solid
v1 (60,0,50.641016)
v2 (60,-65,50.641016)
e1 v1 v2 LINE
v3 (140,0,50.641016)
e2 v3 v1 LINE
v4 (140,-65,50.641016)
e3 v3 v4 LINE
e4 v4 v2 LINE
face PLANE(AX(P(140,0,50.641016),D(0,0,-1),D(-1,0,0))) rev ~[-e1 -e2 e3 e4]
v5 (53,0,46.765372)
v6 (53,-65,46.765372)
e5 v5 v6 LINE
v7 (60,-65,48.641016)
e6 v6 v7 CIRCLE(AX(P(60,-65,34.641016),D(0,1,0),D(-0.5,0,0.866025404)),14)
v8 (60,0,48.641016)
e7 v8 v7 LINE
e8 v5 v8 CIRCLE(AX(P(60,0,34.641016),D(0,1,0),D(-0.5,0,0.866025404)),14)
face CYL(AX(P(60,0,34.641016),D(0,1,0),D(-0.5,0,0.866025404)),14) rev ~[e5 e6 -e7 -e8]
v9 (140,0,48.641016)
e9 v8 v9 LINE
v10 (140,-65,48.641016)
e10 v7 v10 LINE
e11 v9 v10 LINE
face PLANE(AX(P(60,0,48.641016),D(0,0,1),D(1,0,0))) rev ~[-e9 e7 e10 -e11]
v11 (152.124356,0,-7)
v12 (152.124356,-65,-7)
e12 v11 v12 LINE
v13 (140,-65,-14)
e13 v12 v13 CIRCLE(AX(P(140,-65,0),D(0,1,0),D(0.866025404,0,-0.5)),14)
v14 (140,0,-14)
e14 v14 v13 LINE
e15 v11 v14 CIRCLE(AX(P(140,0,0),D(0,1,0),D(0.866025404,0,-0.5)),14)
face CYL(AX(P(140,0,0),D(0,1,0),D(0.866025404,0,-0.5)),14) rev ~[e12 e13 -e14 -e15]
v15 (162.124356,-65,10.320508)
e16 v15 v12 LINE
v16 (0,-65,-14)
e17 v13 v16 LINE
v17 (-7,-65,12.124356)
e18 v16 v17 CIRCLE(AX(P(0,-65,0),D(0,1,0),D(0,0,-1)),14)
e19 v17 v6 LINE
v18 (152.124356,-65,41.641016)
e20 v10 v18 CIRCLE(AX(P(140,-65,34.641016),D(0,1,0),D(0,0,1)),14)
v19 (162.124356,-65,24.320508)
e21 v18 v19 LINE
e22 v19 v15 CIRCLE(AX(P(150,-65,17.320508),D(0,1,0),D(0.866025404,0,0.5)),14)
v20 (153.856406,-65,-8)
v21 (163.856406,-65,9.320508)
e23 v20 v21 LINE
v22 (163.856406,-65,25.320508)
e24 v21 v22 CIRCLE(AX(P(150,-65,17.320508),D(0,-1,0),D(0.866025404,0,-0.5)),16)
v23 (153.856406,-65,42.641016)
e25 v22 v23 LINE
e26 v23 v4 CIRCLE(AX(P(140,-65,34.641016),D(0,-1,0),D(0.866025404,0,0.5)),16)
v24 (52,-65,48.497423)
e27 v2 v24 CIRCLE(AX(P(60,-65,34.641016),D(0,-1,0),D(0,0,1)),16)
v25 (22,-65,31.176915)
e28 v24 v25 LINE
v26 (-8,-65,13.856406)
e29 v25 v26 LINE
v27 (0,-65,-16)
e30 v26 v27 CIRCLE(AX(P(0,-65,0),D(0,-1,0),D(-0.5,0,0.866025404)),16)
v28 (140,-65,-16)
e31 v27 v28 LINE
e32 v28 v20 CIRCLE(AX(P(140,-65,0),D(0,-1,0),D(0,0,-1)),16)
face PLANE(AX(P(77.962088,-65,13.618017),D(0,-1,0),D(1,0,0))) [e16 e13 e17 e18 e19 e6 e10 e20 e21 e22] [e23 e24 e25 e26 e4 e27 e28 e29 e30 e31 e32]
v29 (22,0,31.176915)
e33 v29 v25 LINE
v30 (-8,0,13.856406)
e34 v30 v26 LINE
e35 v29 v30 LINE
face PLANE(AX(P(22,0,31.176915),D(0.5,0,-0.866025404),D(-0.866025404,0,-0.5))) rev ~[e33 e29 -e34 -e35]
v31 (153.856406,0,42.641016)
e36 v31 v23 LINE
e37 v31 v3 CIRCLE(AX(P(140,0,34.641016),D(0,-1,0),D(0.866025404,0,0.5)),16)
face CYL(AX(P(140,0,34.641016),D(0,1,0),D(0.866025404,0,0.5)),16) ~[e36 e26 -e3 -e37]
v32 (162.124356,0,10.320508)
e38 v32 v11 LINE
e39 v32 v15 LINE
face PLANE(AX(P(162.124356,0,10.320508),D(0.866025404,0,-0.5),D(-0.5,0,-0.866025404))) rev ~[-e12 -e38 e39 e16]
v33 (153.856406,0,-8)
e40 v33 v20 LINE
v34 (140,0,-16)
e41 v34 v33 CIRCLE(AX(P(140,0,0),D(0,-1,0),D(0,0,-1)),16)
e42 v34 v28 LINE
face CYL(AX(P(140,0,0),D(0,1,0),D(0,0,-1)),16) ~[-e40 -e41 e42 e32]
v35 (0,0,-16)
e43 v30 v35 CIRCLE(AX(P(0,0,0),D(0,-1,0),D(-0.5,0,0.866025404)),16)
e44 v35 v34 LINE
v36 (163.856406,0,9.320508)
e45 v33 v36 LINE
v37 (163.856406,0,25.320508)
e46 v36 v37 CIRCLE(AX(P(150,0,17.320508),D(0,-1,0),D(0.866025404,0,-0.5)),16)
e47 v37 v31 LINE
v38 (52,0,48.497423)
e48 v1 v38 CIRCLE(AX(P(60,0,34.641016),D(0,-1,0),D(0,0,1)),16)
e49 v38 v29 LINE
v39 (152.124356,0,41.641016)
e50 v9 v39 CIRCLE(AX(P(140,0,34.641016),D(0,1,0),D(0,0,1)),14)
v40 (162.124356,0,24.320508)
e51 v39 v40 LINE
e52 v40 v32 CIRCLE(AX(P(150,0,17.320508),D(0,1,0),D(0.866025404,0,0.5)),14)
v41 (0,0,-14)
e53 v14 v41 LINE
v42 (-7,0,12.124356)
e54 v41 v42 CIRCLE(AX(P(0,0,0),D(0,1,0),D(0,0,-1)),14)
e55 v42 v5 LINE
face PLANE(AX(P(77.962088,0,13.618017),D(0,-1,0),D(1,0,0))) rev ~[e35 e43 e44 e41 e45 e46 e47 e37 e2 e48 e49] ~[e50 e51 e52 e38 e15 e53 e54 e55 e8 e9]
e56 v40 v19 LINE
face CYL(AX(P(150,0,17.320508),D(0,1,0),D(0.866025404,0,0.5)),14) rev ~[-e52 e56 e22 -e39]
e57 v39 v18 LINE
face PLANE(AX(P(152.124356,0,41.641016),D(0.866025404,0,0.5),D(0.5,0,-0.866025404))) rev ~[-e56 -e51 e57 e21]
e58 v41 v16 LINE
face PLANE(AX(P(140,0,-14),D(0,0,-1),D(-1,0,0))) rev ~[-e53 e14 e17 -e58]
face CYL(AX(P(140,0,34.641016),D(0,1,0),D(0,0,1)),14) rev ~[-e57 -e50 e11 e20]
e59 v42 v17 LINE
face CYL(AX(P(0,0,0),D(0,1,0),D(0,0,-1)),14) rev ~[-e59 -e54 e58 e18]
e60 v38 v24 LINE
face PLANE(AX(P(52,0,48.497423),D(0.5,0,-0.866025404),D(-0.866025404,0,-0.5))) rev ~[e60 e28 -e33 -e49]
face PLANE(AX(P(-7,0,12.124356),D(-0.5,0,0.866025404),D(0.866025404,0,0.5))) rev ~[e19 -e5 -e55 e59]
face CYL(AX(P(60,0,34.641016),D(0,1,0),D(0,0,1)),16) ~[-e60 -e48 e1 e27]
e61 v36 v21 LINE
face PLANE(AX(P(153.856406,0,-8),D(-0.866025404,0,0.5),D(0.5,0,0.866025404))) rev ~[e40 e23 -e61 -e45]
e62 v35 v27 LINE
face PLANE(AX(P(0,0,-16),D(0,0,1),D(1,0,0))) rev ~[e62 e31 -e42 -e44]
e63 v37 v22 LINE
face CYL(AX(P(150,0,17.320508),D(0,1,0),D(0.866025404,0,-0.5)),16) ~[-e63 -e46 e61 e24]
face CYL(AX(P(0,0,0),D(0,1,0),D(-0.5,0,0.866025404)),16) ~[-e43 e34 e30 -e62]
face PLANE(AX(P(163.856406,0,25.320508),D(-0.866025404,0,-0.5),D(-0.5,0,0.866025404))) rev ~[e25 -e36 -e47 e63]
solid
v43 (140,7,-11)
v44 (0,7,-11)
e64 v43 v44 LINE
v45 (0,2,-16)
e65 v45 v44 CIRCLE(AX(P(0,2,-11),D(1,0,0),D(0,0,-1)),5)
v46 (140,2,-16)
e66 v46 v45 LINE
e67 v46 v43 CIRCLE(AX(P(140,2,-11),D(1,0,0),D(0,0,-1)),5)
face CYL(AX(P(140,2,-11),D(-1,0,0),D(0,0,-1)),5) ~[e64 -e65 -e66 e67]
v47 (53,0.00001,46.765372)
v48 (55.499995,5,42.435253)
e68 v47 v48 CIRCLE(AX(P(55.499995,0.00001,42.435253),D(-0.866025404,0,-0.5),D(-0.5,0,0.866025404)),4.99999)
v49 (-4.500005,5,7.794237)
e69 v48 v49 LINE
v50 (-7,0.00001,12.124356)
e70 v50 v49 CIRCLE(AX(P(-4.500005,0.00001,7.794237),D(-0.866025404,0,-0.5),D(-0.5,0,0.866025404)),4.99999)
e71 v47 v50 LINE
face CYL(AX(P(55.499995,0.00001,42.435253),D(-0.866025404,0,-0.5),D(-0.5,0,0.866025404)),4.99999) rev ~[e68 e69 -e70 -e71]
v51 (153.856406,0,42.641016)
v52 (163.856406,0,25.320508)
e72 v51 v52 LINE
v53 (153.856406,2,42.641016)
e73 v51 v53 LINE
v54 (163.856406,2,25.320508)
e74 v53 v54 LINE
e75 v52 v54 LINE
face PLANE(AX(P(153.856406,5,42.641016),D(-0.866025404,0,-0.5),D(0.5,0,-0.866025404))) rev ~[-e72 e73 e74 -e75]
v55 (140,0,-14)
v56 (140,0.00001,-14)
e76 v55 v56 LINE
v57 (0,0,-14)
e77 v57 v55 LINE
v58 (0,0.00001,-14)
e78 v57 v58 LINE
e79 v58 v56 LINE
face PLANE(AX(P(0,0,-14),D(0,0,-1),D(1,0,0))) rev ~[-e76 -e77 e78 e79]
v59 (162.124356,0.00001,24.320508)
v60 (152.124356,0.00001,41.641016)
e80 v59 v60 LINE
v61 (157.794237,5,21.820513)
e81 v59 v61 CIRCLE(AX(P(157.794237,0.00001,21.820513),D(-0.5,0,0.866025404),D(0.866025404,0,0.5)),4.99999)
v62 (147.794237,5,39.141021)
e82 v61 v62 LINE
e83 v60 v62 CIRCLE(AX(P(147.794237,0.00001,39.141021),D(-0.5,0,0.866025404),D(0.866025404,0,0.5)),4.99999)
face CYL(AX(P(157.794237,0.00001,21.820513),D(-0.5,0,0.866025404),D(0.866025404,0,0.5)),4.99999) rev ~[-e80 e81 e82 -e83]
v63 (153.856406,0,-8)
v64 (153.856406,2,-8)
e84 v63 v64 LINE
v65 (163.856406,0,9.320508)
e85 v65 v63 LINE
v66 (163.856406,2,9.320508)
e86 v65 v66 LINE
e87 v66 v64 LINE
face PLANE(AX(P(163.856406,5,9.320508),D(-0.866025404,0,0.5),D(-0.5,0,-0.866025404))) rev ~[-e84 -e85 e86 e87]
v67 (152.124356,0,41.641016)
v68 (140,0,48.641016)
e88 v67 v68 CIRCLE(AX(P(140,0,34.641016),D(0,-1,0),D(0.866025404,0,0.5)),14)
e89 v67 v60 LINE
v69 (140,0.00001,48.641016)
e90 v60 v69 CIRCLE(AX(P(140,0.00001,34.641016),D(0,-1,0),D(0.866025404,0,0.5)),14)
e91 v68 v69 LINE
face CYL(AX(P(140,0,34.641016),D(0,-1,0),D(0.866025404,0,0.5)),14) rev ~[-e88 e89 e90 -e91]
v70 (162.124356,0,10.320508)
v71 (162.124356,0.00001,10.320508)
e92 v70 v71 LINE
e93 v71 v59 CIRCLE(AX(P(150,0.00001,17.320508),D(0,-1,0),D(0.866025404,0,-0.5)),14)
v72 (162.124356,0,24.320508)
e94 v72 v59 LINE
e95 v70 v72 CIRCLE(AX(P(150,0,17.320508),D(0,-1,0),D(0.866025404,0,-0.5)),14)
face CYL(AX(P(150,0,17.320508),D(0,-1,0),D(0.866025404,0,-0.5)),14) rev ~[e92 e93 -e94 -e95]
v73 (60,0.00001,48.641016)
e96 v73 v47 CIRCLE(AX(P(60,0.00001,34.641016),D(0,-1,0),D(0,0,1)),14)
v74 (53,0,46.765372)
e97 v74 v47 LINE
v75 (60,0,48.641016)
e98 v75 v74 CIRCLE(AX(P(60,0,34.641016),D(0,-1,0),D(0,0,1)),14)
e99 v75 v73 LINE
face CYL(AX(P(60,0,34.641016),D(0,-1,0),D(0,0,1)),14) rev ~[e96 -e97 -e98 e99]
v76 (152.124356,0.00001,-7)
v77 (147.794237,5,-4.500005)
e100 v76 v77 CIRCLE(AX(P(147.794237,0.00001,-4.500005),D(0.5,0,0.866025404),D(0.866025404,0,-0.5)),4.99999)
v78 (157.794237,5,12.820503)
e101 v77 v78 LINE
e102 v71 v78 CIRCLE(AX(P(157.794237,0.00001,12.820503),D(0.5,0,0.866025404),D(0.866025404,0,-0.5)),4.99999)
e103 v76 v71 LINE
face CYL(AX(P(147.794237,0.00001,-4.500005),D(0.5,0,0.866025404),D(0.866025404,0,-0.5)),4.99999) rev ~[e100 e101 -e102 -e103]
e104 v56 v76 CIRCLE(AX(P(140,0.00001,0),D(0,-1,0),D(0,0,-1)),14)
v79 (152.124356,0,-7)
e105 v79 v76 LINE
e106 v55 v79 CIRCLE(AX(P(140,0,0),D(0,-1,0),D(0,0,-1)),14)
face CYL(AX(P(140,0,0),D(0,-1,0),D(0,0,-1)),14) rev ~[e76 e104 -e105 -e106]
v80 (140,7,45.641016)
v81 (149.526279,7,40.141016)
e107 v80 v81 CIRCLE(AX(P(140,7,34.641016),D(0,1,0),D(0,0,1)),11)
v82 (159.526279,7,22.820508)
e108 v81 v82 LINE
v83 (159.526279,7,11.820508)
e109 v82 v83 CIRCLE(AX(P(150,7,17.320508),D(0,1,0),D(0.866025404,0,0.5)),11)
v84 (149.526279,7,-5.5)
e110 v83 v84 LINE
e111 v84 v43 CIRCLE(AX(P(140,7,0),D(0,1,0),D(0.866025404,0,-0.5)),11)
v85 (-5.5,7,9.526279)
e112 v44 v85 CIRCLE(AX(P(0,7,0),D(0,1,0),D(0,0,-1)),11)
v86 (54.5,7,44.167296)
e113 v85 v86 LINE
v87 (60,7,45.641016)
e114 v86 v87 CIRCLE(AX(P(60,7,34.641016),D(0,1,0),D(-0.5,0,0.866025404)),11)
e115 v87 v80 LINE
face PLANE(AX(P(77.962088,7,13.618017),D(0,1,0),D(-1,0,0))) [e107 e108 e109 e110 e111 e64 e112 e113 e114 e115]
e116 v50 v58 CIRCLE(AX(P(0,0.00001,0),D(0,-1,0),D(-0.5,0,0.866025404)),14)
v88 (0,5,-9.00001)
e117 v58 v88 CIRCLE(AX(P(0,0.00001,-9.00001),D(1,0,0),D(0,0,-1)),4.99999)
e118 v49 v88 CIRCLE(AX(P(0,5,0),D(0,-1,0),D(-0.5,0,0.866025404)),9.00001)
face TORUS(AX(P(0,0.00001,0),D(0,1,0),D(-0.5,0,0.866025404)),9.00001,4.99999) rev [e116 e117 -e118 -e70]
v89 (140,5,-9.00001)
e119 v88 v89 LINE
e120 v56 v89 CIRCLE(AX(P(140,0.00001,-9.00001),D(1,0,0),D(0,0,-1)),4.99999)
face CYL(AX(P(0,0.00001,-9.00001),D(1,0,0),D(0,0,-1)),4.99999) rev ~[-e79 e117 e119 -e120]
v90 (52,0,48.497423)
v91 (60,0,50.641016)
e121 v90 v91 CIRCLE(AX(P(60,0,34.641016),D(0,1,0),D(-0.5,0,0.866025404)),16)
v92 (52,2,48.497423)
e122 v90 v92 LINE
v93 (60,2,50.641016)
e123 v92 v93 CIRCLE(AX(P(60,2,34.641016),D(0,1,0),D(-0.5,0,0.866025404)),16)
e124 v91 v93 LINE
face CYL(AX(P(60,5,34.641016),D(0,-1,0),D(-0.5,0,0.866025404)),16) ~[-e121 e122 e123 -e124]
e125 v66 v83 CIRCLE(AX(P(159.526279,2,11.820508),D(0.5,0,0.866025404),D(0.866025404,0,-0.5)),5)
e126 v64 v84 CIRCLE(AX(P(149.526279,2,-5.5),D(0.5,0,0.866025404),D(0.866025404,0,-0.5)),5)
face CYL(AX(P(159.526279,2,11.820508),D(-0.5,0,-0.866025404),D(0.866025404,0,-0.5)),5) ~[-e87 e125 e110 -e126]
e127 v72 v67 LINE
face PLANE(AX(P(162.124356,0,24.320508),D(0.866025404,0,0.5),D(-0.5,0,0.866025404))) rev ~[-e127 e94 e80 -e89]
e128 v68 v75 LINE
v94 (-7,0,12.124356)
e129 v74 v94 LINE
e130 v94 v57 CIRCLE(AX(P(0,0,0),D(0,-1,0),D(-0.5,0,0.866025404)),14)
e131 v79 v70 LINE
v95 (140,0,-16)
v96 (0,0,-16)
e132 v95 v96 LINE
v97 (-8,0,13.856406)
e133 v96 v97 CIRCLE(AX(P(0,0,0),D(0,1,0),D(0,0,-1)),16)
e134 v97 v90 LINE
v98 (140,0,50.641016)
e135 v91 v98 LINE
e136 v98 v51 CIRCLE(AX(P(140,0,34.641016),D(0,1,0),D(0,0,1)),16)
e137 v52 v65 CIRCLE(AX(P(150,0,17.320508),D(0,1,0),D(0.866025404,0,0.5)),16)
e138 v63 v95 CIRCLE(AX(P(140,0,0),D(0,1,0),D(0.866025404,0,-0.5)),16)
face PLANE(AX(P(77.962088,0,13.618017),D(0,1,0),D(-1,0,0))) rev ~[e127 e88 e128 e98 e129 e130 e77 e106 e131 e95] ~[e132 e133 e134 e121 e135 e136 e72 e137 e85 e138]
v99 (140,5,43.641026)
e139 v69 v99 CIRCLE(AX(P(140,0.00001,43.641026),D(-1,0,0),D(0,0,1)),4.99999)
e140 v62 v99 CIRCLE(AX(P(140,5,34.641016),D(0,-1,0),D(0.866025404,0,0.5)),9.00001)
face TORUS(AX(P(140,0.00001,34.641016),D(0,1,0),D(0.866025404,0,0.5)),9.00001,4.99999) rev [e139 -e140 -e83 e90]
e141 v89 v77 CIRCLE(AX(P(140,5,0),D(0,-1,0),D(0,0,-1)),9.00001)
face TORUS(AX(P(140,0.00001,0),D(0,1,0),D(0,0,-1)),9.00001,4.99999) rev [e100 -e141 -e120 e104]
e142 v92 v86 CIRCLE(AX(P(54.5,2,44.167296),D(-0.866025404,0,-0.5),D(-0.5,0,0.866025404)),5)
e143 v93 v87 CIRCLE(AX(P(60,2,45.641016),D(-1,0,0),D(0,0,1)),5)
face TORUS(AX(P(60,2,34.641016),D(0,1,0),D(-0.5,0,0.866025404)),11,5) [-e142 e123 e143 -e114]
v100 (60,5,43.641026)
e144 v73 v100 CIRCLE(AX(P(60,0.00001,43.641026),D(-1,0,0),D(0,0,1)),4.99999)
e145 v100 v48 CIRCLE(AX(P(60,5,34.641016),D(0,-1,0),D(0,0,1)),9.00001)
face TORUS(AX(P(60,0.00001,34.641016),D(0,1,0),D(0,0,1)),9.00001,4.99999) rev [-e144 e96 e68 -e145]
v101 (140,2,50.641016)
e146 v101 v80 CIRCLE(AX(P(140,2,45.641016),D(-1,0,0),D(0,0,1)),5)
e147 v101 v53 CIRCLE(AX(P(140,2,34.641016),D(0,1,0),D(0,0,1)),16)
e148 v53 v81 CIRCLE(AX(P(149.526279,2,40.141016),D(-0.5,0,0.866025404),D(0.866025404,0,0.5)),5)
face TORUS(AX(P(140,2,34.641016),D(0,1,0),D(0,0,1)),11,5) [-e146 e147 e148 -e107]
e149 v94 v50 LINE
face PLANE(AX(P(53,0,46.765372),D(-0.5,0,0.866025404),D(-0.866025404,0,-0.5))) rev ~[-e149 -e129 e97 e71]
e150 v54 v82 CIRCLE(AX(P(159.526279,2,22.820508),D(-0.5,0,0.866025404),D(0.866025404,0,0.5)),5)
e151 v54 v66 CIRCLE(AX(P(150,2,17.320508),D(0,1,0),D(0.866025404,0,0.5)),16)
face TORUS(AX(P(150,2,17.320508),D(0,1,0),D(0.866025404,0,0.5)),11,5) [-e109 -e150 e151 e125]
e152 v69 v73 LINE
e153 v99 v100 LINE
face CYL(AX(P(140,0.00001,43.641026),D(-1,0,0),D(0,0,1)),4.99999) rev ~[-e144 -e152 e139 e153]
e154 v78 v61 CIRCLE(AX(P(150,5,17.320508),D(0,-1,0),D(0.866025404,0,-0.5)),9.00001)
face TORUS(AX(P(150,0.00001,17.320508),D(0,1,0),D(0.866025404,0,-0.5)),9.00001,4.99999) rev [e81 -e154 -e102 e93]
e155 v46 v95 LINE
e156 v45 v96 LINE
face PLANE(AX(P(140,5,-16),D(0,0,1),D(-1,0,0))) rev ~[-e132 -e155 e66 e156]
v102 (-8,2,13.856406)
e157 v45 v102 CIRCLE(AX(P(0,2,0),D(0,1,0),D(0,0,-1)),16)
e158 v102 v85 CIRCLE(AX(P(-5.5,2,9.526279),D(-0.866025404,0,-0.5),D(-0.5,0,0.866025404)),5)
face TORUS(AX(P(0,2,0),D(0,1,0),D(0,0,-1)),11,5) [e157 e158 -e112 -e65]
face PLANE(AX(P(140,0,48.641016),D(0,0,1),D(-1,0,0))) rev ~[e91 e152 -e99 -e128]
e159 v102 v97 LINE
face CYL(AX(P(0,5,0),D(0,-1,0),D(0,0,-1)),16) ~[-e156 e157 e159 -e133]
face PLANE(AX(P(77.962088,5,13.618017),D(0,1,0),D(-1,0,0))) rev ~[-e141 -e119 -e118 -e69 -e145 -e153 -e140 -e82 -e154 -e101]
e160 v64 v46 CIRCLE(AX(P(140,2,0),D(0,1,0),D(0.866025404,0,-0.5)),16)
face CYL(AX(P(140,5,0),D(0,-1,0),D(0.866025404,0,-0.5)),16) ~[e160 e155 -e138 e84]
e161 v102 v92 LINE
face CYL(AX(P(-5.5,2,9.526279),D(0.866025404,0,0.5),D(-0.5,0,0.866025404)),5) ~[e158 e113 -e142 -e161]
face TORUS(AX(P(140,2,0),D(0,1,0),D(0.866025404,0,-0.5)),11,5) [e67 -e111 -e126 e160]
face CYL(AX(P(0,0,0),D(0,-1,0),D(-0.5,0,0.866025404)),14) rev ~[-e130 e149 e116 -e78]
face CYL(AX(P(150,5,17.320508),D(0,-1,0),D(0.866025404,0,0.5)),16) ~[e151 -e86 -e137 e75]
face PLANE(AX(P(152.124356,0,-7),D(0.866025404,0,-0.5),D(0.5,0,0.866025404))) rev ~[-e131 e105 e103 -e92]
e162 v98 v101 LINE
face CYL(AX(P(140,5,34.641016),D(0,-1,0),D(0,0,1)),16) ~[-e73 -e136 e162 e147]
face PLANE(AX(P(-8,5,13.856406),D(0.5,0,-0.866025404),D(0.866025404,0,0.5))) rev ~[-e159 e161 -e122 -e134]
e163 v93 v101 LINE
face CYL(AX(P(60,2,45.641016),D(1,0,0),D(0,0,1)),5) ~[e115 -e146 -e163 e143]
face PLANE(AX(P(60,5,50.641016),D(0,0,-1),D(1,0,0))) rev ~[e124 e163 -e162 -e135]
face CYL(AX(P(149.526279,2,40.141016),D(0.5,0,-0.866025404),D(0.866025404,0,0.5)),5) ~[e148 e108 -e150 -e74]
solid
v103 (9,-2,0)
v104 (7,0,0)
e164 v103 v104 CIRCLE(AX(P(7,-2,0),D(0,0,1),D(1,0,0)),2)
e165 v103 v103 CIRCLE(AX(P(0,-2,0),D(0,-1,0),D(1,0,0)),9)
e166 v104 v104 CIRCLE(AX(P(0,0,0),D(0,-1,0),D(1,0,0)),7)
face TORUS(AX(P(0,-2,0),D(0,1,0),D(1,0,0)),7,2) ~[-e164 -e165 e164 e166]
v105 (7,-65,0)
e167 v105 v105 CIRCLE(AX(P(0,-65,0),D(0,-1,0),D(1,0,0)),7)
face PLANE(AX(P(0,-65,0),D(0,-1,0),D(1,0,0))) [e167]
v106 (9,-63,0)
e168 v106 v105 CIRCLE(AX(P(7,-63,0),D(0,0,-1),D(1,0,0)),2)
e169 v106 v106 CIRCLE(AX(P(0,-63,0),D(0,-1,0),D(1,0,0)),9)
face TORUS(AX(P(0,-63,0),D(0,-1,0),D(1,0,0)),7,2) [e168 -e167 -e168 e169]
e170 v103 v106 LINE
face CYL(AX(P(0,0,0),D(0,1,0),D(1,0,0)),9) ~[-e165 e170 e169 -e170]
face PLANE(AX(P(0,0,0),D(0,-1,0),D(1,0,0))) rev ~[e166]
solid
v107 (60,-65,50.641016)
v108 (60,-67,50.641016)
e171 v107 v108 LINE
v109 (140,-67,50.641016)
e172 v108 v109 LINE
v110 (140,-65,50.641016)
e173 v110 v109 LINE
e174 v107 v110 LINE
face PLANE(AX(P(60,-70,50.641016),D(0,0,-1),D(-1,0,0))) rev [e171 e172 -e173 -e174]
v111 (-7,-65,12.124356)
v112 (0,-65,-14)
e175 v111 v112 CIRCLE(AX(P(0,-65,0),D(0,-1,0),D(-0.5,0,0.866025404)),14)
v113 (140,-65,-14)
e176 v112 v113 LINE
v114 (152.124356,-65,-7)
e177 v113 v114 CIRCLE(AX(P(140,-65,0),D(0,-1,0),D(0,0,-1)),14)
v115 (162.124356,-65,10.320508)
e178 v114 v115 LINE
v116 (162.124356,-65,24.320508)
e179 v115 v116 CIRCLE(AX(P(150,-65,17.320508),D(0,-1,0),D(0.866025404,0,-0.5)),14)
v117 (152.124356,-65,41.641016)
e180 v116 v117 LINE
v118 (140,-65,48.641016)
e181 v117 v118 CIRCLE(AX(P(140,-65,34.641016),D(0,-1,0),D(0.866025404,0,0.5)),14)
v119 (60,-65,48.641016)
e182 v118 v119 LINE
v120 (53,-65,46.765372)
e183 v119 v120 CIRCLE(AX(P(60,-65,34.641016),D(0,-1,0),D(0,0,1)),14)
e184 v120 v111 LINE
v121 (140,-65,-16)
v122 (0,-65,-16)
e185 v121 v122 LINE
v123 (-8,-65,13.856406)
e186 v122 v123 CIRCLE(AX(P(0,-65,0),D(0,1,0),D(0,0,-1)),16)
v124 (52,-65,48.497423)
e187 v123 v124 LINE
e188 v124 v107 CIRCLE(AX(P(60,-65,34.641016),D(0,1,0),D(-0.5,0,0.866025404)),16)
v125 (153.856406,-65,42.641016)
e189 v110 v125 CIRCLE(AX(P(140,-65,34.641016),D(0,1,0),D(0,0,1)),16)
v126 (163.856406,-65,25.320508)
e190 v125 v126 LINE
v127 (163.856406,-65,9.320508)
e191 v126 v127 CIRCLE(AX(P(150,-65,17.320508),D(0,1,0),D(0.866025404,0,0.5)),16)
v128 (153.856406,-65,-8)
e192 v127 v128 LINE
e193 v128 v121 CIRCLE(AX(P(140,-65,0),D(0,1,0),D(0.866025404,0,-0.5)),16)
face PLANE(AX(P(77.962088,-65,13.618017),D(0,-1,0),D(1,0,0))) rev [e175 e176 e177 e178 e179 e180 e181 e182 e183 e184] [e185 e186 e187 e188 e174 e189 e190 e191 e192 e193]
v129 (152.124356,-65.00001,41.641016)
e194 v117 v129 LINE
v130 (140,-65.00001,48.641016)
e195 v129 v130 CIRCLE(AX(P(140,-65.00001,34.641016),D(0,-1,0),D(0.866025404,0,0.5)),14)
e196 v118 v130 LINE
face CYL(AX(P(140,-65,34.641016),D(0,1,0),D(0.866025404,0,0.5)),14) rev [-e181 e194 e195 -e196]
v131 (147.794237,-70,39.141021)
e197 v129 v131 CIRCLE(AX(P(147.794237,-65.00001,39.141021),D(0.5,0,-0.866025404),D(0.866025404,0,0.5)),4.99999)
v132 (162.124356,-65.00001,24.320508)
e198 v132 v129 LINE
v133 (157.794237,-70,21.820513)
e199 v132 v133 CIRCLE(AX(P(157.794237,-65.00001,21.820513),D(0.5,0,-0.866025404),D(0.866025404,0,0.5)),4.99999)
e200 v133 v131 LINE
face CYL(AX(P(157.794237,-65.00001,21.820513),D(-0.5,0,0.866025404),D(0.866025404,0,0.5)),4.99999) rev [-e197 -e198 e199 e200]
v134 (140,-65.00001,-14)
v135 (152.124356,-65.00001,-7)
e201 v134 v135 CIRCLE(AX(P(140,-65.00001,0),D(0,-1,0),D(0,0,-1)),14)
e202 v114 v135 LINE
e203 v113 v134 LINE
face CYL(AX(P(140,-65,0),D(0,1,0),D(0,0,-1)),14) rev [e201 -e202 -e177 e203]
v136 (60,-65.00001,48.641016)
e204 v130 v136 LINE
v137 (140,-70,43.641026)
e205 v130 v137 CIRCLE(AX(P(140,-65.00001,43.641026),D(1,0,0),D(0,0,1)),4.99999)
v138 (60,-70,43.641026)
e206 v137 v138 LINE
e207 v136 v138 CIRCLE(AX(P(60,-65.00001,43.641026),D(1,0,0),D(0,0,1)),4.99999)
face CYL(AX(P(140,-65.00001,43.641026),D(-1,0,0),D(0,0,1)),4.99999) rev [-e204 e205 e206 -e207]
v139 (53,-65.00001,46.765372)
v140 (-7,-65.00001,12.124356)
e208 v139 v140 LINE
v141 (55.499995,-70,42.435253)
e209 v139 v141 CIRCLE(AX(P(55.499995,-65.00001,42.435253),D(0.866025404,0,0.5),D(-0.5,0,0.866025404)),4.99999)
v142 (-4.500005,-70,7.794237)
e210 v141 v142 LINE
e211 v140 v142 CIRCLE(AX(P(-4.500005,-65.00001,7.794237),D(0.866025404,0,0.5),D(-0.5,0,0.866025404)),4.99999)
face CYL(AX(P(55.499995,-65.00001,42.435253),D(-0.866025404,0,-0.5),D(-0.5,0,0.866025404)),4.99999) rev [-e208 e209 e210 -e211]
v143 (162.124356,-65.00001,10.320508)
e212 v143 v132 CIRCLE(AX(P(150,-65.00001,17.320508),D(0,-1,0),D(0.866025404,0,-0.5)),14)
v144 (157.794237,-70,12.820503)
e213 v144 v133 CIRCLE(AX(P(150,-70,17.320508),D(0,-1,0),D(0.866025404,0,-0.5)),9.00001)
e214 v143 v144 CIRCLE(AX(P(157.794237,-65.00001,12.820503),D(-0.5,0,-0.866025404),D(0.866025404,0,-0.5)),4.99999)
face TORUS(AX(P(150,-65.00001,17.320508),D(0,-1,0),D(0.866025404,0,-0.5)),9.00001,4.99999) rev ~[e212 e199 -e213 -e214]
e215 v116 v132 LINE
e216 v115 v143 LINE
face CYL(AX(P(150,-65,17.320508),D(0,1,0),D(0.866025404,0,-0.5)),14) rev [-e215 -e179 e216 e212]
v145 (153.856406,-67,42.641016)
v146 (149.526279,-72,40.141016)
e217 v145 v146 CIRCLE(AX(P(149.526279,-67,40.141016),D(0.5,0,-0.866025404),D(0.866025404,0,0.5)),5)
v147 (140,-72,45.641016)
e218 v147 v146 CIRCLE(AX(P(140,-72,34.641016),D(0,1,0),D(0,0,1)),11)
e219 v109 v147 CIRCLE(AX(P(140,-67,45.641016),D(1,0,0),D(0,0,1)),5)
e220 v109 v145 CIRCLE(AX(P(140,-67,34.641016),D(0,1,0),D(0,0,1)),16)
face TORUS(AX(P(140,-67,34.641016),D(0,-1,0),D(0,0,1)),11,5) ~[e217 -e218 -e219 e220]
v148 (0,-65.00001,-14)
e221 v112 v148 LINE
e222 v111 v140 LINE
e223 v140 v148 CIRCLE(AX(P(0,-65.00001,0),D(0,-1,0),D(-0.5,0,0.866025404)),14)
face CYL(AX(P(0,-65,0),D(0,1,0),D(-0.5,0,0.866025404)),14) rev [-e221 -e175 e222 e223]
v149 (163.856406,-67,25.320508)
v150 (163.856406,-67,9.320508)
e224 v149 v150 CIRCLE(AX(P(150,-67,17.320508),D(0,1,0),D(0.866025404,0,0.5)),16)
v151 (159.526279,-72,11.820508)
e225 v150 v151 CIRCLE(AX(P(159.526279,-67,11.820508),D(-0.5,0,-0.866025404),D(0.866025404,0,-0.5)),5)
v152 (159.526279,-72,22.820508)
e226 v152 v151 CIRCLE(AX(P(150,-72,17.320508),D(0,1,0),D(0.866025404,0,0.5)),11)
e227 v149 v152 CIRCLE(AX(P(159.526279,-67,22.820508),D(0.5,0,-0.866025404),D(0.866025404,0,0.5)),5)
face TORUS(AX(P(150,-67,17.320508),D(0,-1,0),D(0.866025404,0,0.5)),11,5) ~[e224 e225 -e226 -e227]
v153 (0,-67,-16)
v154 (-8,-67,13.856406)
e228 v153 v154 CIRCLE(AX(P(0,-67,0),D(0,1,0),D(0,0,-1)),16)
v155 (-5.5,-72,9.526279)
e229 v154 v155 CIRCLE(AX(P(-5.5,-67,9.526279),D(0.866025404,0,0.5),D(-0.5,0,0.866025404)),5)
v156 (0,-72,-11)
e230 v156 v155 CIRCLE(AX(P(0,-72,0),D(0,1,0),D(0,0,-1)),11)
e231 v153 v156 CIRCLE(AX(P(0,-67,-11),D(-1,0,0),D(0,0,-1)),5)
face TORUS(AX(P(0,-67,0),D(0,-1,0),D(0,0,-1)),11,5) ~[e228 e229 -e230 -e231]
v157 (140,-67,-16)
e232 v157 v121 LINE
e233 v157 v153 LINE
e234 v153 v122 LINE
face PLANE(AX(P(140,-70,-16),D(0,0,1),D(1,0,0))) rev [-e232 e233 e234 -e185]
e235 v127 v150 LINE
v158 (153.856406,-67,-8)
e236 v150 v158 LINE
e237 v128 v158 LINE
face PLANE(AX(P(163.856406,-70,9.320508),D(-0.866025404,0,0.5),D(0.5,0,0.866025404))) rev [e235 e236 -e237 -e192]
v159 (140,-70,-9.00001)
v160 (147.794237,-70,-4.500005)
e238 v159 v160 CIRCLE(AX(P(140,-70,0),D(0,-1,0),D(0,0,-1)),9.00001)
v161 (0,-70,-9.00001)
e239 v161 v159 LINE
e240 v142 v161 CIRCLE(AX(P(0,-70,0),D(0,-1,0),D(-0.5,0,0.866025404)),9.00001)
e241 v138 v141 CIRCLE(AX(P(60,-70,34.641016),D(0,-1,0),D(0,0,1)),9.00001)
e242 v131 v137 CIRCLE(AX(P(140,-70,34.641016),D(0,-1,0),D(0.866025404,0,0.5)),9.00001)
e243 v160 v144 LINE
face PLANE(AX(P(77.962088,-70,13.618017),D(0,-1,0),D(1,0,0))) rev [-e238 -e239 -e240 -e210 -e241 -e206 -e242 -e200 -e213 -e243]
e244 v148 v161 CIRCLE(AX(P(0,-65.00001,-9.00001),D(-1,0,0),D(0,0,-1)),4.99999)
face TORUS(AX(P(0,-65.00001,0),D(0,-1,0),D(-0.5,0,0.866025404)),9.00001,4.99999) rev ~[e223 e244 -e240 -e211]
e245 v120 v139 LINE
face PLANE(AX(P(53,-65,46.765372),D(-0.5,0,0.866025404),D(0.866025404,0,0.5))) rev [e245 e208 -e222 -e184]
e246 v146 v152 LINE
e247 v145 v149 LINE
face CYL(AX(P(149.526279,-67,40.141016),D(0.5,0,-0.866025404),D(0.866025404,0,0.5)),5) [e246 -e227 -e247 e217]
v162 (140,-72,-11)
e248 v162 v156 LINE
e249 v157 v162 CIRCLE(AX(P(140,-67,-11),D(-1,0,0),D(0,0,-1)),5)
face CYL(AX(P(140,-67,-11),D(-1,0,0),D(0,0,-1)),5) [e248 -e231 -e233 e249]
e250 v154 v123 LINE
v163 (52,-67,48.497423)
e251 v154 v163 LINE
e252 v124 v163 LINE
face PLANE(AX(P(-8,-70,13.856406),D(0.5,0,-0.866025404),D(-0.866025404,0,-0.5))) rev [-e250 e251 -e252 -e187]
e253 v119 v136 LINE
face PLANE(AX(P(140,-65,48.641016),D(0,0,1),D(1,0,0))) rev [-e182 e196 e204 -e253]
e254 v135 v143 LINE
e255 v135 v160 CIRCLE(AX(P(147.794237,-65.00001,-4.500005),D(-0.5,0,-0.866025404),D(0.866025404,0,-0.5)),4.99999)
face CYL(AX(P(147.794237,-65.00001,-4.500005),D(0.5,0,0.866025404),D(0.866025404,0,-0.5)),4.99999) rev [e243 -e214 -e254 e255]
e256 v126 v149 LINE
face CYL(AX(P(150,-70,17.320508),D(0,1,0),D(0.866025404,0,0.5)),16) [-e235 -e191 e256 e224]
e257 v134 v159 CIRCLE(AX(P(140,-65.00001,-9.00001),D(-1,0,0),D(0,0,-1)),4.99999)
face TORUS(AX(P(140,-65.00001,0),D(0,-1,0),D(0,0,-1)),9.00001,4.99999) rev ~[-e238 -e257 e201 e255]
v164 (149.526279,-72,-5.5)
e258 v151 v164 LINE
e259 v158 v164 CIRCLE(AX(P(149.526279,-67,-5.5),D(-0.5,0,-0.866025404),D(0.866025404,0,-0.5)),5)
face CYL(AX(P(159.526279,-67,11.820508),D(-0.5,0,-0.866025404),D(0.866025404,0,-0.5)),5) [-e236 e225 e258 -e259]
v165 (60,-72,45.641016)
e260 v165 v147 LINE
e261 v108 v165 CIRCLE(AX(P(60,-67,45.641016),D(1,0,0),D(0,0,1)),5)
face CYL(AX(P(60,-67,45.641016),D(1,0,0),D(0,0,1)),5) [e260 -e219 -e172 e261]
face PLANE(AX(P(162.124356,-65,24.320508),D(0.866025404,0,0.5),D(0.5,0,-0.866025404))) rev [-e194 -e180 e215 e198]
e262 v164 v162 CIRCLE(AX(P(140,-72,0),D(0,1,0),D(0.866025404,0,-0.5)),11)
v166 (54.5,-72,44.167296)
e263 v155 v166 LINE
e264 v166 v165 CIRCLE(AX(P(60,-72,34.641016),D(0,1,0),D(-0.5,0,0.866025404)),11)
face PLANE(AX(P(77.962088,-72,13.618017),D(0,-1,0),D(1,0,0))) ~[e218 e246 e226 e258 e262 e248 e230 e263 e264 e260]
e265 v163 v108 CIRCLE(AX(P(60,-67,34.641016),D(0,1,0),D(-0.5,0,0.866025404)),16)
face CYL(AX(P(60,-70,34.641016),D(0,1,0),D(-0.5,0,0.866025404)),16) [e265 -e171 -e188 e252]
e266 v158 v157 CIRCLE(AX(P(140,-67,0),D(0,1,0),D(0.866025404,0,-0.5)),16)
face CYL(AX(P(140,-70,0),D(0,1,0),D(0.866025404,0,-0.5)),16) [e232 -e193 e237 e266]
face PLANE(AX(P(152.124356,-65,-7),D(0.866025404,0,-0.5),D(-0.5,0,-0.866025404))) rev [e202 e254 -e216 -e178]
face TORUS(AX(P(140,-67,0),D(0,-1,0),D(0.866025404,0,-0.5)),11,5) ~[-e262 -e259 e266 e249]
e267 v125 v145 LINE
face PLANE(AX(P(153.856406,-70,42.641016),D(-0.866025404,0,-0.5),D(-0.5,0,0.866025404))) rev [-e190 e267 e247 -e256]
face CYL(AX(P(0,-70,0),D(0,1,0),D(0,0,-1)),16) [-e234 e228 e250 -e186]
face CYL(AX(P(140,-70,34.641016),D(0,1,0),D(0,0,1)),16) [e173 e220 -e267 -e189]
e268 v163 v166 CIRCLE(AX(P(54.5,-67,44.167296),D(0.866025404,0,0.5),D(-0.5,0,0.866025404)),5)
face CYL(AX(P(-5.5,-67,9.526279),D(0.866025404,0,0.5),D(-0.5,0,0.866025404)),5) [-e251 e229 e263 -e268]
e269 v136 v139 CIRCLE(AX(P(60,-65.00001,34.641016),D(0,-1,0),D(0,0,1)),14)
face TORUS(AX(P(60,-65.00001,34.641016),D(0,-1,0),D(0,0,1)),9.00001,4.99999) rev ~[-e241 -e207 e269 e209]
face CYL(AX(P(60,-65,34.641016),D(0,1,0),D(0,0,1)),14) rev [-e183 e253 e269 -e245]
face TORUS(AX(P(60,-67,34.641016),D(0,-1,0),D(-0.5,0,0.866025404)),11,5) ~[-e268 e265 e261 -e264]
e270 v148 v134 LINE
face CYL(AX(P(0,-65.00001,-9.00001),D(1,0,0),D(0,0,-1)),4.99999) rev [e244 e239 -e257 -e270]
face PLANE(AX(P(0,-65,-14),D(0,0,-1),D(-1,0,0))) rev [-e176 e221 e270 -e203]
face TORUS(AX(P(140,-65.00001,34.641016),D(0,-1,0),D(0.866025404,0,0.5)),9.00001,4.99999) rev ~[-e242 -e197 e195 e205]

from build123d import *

# Parameters (mm, degrees)
F0_R     = 9
F1_DEPTH = 65
F2_R     = 2
F4_DEPTH = 65
F6_DEPTH = 5
F8_DEPTH = 2
F9_R     = 5
F10_R    = 4.99999


# Not quite as in the source:
# - a fillet or chamfer is up to 0.001 mm smaller than in the source, because OpenCascade refuses the exact size


with BuildPart() as f1:
    # F0 (on Front) → F1 (new body)
    with BuildSketch(Plane.XZ):
        Circle(F0_R)
    extrude(amount=F1_DEPTH)

    # F2
    f2_edges = [f1.edges().sort_by_distance(p)[0] for p in [
        (-9, 0, 0),
        (-9, -65, 0),
    ]]
    fillet(f2_edges, radius=F2_R)


with BuildPart() as f4:
    # F3 (on Front) → F4 (new body)
    with BuildSketch(Plane.XZ):
        with BuildLine():
            Line((0, -16), (140, -16))
            ThreePointArc((140, -16), (148, -13.8564064606), (153.8564064606, -8))
            Line((153.8564064606, -8), (163.8564064606, 9.3205080757))
            ThreePointArc((163.8564064606, 9.3205080757), (166, 17.3205080757), (163.8564064606, 25.3205080757))
            Line((163.8564064606, 25.3205080757), (153.8564064606, 42.6410161514))
            ThreePointArc((153.8564064606, 42.6410161514), (148, 48.4974226119), (140, 50.6410161514))
            Line((140, 50.6410161514), (60, 50.6410161514))
            ThreePointArc((60, 50.6410161514), (55.8588952784, 50.095829372), (52, 48.4974226119))
            Line((52, 48.4974226119), (22, 31.1769145362))
            Line((22, 31.1769145362), (-8, 13.8564064606))
            ThreePointArc((-8, 13.8564064606), (-15.4548132206, -4.1411047216), (0, -16))
        make_face()
        with BuildLine():
            ThreePointArc((162.124355653, 24.3205080757), (164, 17.3205080757), (162.124355653, 10.3205080757))
            Line((162.124355653, 10.3205080757), (152.124355653, -7))
            ThreePointArc((152.124355653, -7), (147, -12.124355653), (140, -14))
            Line((140, -14), (0, -14))
            ThreePointArc((0, -14), (-13.522961568, -3.6234666314), (-7, 12.124355653))
            Line((-7, 12.124355653), (23, 29.4448637287))
            Line((23, 29.4448637287), (53, 46.7653718044))
            ThreePointArc((53, 46.7653718044), (56.3765333686, 48.1639777194), (60, 48.6410161514))
            Line((60, 48.6410161514), (140, 48.6410161514))
            ThreePointArc((140, 48.6410161514), (147, 46.7653718044), (152.124355653, 41.6410161514))
            Line((152.124355653, 41.6410161514), (162.124355653, 24.3205080757))
        make_face(mode=Mode.SUBTRACT)
    extrude(amount=F4_DEPTH)


with BuildPart() as f6:
    # F5 (on face) → F6 (new body)
    with BuildSketch(Plane(origin=(0, 0, 0), x_dir=(-1, 0, 0), z_dir=(0, 1, 0))):
        with BuildLine():
            ThreePointArc((-140, 50.6410161514), (-148, 48.4974226119), (-153.8564064606, 42.6410161514))
            Line((-153.8564064606, 42.6410161514), (-163.8564064606, 25.3205080757))
            ThreePointArc((-163.8564064606, 25.3205080757), (-166, 17.3205080757), (-163.8564064606, 9.3205080757))
            Line((-163.8564064606, 9.3205080757), (-153.8564064606, -8))
            ThreePointArc((-153.8564064606, -8), (-148, -13.8564064606), (-140, -16))
            Line((-140, -16), (0, -16))
            ThreePointArc((0, -16), (15.4548132206, -4.1411047216), (8, 13.8564064606))
            Line((8, 13.8564064606), (-52, 48.4974226119))
            ThreePointArc((-52, 48.4974226119), (-55.8588952784, 50.095829372), (-60, 50.6410161514))
            Line((-60, 50.6410161514), (-140, 50.6410161514))
        make_face()
        with BuildLine():
            Line((-162.124355653, 24.3205080757), (-152.124355653, 41.6410161514))
            ThreePointArc((-152.124355653, 41.6410161514), (-147, 46.7653718044), (-140, 48.6410161514))
            Line((-140, 48.6410161514), (-60, 48.6410161514))
            ThreePointArc((-60, 48.6410161514), (-56.3765333686, 48.1639777194), (-53, 46.7653718044))
            Line((-53, 46.7653718044), (7, 12.124355653))
            ThreePointArc((7, 12.124355653), (13.522961568, -3.6234666314), (0, -14))
            Line((0, -14), (-140, -14))
            ThreePointArc((-140, -14), (-147, -12.124355653), (-152.124355653, -7))
            Line((-152.124355653, -7), (-162.124355653, 10.3205080757))
            ThreePointArc((-162.124355653, 10.3205080757), (-164, 17.3205080757), (-162.124355653, 24.3205080757))
        make_face(mode=Mode.SUBTRACT)
    extrude(amount=F6_DEPTH)

    # F7 (on face) → F8 (join)
    with BuildSketch(Plane(origin=(0, 5, 0), x_dir=(-1, 0, 0), z_dir=(0, 1, 0))):
        with BuildLine():
            Line((8, 13.8564064606), (-52, 48.4974226119))
            ThreePointArc((-52, 48.4974226119), (-55.8588952784, 50.095829372), (-60, 50.6410161514))
            Line((-60, 50.6410161514), (-140, 50.6410161514))
            ThreePointArc((-140, 50.6410161514), (-148, 48.4974226119), (-153.8564064606, 42.6410161514))
            Line((-153.8564064606, 42.6410161514), (-163.8564064606, 25.3205080757))
            ThreePointArc((-163.8564064606, 25.3205080757), (-166, 17.3205080757), (-163.8564064606, 9.3205080757))
            Line((-163.8564064606, 9.3205080757), (-153.8564064606, -8))
            ThreePointArc((-153.8564064606, -8), (-148, -13.8564064606), (-140, -16))
            Line((-140, -16), (0, -16))
            ThreePointArc((0, -16), (15.4548132206, -4.1411047216), (8, 13.8564064606))
        make_face()
        with BuildLine():
            ThreePointArc((-162.124355653, 10.3205080757), (-164, 17.3205080757), (-162.124355653, 24.3205080757))
            Line((-162.124355653, 24.3205080757), (-152.124355653, 41.6410161514))
            ThreePointArc((-152.124355653, 41.6410161514), (-147, 46.7653718044), (-140, 48.6410161514))
            Line((-140, 48.6410161514), (-60, 48.6410161514))
            ThreePointArc((-60, 48.6410161514), (-56.3765333686, 48.1639777194), (-53, 46.7653718044))
            Line((-53, 46.7653718044), (7, 12.124355653))
            ThreePointArc((7, 12.124355653), (13.522961568, -3.6234666314), (0, -14))
            Line((0, -14), (-140, -14))
            ThreePointArc((-140, -14), (-147, -12.124355653), (-152.124355653, -7))
            Line((-152.124355653, -7), (-162.124355653, 10.3205080757))
        make_face(mode=Mode.SUBTRACT)
        with BuildLine():
            Line((-152.124355653, 41.6410161514), (-162.124355653, 24.3205080757))
            ThreePointArc((-162.124355653, 24.3205080757), (-164, 17.3205080757), (-162.124355653, 10.3205080757))
            Line((-162.124355653, 10.3205080757), (-152.124355653, -7))
            ThreePointArc((-152.124355653, -7), (-147, -12.124355653), (-140, -14))
            Line((-140, -14), (0, -14))
            ThreePointArc((0, -14), (13.522961568, -3.6234666314), (7, 12.124355653))
            Line((7, 12.124355653), (-53, 46.7653718044))
            ThreePointArc((-53, 46.7653718044), (-56.3765333686, 48.1639777194), (-60, 48.6410161514))
            Line((-60, 48.6410161514), (-140, 48.6410161514))
            ThreePointArc((-140, 48.6410161514), (-147, 46.7653718044), (-152.124355653, 41.6410161514))
        make_face()
    extrude(amount=F8_DEPTH)

    # F9
    f9_edges = [f6.edges().sort_by_distance(p)[0] for p in [
        (22, 7, 31.176915),
        (55.858895, 7, 50.095829),
        (100, 7, 50.641016),
        (148, 7, 48.497423),
        (158.856406, 7, 33.980762),
        (166, 7, 17.320508),
        (158.856406, 7, 0.660254),
        (148, 7, -13.856406),
        (70, 7, -16),
        (-15.454813, 7, -4.141105),
    ]]
    fillet(f9_edges, radius=F9_R)

    # F10 (radius 5 in the source; OpenCascade refuses exactly that, so slightly less here)
    f10_edges = [f6.edges().sort_by_distance(p)[0] for p in [
        (157.124356, 5, 32.980762),
        (147, 5, 46.765372),
        (100, 5, 48.641016),
        (56.376533, 5, 48.163978),
        (23, 5, 29.444864),
        (-13.522962, 5, -3.623467),
        (70, 5, -14),
        (147, 5, -12.124356),
        (157.124356, 5, 1.660254),
        (164, 5, 17.320508),
    ]]
    fillet(f10_edges, radius=F10_R)


with BuildPart() as f12_1:
    # F12: instance of F6
    add(f6.part.mirror(Plane.XZ.offset(32.5)))


solid = Compound([f1.part, f4.part, f6.part, f12_1.part])
